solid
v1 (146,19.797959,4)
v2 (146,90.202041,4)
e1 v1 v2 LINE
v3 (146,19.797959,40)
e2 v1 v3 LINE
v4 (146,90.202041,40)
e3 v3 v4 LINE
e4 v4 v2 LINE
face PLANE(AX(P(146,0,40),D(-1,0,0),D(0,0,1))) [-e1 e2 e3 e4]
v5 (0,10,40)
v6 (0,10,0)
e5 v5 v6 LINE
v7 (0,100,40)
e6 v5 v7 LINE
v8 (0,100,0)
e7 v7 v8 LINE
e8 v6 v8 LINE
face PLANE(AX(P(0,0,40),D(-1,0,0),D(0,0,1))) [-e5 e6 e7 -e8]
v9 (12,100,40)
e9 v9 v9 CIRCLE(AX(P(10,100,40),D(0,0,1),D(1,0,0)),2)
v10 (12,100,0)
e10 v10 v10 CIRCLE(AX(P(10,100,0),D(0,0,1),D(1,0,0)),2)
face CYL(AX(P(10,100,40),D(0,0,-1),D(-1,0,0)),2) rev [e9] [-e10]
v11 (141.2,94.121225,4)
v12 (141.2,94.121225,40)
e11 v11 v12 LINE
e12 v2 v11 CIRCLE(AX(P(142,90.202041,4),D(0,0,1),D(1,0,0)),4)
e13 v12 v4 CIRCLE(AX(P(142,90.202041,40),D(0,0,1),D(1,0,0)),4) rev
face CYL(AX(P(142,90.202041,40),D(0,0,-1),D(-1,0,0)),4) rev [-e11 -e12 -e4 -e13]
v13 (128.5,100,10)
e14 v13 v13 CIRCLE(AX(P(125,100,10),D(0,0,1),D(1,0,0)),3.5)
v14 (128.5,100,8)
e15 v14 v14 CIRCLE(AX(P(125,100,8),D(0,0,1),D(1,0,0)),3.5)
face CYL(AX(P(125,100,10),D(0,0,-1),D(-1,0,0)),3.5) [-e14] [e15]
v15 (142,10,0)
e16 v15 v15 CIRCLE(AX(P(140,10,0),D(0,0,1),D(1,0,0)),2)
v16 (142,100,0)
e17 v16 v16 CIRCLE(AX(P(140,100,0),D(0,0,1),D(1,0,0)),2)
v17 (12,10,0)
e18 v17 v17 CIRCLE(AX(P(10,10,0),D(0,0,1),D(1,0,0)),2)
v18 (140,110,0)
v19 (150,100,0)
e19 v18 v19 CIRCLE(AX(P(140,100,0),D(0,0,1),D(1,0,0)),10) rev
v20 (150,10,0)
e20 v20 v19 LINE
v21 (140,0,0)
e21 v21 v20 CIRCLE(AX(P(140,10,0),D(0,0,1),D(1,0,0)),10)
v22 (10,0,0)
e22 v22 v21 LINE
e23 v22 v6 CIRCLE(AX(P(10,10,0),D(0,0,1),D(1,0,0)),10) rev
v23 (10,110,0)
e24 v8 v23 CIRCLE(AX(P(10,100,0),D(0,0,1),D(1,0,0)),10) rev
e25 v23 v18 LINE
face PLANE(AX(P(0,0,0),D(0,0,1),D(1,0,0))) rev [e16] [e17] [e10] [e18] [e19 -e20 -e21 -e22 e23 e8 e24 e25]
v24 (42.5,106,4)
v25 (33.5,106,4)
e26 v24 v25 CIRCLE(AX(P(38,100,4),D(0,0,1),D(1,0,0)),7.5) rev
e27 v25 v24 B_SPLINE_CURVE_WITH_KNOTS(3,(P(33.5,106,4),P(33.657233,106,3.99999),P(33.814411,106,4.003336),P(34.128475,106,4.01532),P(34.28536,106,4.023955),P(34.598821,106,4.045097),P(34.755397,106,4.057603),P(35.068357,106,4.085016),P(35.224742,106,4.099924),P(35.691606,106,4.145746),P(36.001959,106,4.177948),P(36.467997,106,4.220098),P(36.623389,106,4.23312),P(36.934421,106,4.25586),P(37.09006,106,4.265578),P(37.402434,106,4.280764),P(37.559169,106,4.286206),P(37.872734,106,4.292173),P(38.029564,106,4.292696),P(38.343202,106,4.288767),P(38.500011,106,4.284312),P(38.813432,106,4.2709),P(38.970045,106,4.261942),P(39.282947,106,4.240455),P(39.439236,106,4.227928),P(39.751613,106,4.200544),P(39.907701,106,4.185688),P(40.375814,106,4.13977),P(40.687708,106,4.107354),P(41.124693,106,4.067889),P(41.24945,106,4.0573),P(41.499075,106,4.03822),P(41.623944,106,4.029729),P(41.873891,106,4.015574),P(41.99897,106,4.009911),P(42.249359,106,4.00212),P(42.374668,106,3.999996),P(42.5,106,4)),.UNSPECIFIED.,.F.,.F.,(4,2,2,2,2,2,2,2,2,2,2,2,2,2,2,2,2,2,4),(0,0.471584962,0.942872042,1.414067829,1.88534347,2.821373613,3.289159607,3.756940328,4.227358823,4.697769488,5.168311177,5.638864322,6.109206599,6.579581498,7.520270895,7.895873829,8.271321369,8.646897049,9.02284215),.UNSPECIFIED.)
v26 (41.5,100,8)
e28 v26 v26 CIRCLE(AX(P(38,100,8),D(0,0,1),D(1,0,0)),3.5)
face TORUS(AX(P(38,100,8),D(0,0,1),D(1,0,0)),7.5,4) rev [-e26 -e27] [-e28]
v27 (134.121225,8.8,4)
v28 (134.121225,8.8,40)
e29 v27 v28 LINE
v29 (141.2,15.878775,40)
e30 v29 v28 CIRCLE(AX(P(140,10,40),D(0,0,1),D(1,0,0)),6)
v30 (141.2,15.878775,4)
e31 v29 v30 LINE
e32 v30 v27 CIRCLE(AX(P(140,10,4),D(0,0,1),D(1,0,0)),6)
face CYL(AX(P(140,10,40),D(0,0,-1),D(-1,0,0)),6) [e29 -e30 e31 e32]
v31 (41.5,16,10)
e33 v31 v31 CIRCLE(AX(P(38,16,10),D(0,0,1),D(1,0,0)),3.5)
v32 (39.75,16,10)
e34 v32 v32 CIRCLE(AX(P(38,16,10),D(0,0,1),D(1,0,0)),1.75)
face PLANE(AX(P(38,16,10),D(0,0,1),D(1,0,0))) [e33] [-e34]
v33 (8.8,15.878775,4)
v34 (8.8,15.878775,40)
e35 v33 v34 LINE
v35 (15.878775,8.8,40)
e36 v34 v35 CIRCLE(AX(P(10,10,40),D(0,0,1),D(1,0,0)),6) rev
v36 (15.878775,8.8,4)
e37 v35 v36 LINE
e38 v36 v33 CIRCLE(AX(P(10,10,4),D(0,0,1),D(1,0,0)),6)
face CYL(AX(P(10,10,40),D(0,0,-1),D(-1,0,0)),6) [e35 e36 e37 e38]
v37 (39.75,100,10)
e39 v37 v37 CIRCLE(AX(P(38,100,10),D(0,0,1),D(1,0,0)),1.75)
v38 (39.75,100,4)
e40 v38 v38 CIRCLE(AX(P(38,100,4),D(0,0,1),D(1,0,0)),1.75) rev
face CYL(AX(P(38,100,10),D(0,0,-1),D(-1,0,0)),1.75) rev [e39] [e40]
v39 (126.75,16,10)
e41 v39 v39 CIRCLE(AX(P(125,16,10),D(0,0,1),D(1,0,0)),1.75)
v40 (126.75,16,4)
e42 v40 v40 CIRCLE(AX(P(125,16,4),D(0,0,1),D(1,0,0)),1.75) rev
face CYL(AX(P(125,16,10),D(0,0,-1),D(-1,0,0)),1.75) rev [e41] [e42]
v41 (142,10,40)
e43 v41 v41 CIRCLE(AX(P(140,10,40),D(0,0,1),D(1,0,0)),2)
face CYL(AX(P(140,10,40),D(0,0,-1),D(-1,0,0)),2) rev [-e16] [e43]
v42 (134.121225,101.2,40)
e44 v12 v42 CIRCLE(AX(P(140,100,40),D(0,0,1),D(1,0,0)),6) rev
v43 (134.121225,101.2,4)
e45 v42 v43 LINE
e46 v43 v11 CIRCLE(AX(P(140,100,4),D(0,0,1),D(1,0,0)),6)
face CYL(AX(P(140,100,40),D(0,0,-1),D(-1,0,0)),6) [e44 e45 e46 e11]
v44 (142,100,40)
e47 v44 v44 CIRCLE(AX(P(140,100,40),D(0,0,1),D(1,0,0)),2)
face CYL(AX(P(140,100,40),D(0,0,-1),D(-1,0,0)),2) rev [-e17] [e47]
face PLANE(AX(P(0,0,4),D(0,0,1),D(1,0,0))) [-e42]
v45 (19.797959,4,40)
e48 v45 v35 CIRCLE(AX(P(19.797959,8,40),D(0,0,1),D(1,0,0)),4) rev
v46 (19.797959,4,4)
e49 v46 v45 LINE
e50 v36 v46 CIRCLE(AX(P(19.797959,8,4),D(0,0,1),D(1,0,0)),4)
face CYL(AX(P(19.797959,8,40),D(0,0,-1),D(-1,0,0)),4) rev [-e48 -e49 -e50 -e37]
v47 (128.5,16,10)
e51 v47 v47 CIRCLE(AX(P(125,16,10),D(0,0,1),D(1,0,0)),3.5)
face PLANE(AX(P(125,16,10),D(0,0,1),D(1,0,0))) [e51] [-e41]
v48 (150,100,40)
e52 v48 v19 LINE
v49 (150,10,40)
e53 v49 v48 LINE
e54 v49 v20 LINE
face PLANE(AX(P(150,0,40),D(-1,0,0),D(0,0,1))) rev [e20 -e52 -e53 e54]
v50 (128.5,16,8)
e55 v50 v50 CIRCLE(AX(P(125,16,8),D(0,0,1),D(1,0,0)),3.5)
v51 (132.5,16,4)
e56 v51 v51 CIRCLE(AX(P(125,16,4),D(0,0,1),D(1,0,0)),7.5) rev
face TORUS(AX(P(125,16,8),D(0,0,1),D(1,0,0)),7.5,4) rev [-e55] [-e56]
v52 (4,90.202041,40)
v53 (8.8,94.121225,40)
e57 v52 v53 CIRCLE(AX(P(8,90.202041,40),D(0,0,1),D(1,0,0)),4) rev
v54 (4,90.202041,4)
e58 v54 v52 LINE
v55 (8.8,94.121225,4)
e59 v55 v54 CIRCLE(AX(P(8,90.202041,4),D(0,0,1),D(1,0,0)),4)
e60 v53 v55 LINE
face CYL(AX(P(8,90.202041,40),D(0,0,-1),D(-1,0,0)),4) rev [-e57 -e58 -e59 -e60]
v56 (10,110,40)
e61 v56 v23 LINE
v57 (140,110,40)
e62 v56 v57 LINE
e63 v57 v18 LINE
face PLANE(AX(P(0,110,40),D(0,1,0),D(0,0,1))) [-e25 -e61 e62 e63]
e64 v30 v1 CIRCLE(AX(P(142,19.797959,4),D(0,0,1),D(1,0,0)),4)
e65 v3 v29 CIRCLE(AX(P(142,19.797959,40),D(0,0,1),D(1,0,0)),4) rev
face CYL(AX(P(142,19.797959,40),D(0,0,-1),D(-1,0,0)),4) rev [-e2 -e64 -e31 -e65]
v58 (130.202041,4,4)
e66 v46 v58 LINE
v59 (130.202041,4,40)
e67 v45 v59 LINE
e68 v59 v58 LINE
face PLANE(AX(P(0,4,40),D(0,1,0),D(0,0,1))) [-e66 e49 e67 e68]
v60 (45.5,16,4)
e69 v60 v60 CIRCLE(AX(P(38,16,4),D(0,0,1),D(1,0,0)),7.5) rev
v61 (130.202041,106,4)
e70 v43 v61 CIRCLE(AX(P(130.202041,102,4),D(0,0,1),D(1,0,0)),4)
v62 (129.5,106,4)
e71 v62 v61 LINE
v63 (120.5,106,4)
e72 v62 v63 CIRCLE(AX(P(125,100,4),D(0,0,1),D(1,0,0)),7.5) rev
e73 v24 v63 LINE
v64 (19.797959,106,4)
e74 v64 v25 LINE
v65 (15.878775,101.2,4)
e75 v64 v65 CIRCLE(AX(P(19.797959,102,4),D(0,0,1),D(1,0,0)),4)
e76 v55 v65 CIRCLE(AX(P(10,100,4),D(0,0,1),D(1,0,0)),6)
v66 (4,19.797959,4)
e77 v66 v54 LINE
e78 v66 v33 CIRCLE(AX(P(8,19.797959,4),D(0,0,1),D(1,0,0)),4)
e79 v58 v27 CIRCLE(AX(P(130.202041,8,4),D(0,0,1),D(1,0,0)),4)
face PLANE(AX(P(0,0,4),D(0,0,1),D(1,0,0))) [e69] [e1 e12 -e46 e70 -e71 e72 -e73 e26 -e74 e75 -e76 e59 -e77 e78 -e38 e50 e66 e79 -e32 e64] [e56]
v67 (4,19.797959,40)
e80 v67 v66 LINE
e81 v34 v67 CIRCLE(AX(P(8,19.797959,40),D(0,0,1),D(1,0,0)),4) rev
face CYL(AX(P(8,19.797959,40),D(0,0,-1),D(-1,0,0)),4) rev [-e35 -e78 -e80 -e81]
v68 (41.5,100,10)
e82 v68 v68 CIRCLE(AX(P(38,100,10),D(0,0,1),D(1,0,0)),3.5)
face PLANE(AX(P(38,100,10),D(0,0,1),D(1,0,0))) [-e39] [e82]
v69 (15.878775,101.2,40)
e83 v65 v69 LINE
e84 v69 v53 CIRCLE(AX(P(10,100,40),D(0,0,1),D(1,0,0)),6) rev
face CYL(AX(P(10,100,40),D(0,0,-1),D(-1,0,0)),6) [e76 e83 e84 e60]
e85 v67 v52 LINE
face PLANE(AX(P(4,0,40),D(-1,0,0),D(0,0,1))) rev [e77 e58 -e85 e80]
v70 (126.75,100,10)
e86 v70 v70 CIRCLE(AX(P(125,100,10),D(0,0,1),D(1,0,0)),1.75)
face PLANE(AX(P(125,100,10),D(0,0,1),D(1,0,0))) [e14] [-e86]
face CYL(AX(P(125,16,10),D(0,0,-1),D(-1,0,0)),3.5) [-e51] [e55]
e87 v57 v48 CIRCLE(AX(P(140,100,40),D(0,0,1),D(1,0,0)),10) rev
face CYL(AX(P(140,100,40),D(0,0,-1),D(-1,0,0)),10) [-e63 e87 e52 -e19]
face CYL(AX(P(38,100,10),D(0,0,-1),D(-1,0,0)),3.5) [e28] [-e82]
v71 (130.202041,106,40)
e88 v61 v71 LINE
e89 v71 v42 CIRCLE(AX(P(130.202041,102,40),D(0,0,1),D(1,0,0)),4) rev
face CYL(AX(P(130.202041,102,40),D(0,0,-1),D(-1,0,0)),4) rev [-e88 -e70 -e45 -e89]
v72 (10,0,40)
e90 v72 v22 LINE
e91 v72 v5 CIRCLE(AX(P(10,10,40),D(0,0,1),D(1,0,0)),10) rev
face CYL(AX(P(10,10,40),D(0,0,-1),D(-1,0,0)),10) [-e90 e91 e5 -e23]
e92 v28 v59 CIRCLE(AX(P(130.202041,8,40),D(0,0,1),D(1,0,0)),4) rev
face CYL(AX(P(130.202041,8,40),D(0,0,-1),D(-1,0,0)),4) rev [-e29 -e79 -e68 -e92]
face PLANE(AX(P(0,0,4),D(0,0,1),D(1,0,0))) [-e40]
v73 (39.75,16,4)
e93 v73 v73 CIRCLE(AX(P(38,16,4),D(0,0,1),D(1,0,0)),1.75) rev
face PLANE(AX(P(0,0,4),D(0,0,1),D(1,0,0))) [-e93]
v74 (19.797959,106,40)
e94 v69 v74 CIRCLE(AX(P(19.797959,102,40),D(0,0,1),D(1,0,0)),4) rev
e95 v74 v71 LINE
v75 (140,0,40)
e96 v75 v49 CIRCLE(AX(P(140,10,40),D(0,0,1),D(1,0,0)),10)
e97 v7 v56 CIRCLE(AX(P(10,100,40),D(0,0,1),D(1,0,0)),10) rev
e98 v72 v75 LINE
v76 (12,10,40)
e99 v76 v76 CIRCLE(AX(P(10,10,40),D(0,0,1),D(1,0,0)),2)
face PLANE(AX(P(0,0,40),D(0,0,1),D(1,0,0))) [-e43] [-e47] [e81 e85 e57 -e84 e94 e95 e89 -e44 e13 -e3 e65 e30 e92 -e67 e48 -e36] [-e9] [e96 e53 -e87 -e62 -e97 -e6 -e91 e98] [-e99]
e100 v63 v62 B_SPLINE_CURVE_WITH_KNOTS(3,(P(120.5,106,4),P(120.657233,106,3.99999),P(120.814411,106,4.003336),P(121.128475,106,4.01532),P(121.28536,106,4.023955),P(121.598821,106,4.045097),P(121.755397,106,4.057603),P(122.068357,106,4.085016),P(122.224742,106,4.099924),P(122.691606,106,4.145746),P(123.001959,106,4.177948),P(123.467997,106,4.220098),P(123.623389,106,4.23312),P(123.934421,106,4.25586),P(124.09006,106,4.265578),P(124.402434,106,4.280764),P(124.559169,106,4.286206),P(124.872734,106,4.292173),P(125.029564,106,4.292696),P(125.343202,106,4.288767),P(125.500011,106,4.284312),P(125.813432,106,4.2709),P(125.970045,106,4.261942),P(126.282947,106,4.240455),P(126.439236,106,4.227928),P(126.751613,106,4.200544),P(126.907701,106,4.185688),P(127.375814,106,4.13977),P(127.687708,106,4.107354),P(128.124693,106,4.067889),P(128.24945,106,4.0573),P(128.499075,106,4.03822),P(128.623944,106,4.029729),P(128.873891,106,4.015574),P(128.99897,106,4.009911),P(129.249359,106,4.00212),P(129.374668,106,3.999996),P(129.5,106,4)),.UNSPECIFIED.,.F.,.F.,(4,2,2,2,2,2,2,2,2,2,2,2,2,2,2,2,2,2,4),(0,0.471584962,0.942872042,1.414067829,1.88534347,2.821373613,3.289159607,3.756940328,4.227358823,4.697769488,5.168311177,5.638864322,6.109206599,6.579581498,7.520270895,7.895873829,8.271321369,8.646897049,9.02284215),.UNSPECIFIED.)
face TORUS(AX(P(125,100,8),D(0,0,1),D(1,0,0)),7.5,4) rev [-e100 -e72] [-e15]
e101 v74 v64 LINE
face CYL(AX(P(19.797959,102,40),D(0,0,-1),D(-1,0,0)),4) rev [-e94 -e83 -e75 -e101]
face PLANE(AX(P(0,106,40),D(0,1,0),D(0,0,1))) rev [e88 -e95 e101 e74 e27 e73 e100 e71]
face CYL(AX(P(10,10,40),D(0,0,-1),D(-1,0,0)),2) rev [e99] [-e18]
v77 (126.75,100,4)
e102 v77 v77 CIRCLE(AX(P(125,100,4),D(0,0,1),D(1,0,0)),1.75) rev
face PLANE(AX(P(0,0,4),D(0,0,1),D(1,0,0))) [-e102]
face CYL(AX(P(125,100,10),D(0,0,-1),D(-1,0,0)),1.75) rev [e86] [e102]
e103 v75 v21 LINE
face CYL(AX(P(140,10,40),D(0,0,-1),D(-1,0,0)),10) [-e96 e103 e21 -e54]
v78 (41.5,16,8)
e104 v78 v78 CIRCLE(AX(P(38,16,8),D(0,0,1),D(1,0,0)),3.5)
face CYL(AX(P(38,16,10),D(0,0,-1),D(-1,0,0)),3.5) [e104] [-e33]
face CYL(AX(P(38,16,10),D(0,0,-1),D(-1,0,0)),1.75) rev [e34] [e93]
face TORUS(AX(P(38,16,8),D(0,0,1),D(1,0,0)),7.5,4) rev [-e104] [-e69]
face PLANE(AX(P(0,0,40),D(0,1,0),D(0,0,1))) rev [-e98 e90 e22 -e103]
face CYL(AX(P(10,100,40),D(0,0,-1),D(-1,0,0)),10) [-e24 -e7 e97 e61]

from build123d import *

# Parameters (mm, degrees)
BOSS_EXTRUDE1_DEPTH = 4
SKETCH1_3_R         = 2
BOSS_EXTRUDE4_DEPTH = 40
FILLET3_R           = 4
SKETCH4_R           = 3.5
SKETCH4_R_2         = 1.75
BOSS_EXTRUDE5_DEPTH = 6
FILLET2_R           = 4


with BuildPart() as part:
    # Sketch1 → Boss-Extrude1 (new body)
    with BuildSketch(Plane.XY):
        with BuildLine():
            ThreePointArc((16, 10), (14.242640687, 5.757359313), (10, 4))
            Line((10, 4), (140, 4))
            ThreePointArc((140, 4), (135.757359313, 14.242640687), (146, 10))
            Line((146, 10), (146, 100))
            ThreePointArc((146, 100), (135.757359313, 95.757359313), (140, 106))
            Line((140, 106), (10, 106))
            ThreePointArc((10, 106), (14.242640687, 104.242640687), (16, 100))
            ThreePointArc((16, 100), (10, 94), (4, 100))
            Line((4, 100), (4, 10))
            ThreePointArc((4, 10), (10, 16), (16, 10))
        make_face()
    extrude(amount=BOSS_EXTRUDE1_DEPTH)

    # Sketch1<3> → Boss-Extrude4 (add)
    with BuildSketch(Plane.XY):
        with BuildLine():
            ThreePointArc((0, 10), (2.928932188, 2.928932188), (10, 0))
            Line((10, 0), (140, 0))
            ThreePointArc((140, 0), (147.071067812, 2.928932188), (150, 10))
            Line((150, 10), (150, 100))
            ThreePointArc((150, 100), (147.071067812, 107.071067812), (140, 110))
            Line((140, 110), (10, 110))
            ThreePointArc((10, 110), (2.928932188, 107.071067812), (0, 100))
            Line((0, 100), (0, 10))
        make_face()
        with BuildLine():
            Line((140, 4), (10, 4))
            ThreePointArc((10, 4), (14.242640687, 14.242640687), (4, 10))
            Line((4, 10), (4, 100))
            ThreePointArc((4, 100), (14.242640687, 95.757359313), (10, 106))
            Line((10, 106), (140, 106))
            ThreePointArc((140, 106), (135.757359313, 95.757359313), (146, 100))
            Line((146, 100), (146, 10))
            ThreePointArc((146, 10), (135.757359313, 14.242640687), (140, 4))
        make_face(mode=Mode.SUBTRACT)
        with Locations((10, 10)):
            Circle(SKETCH1_3_R, mode=Mode.SUBTRACT)
        with Locations((140, 10)):
            Circle(SKETCH1_3_R, mode=Mode.SUBTRACT)
        with Locations((10, 100)):
            Circle(SKETCH1_3_R, mode=Mode.SUBTRACT)
        with Locations((140, 100)):
            Circle(SKETCH1_3_R, mode=Mode.SUBTRACT)
    extrude(amount=BOSS_EXTRUDE4_DEPTH)

    # Fillet3
    fillet3_edges = [part.edges().sort_by_distance(p)[0] for p in [
        (140, 4, 22),
    ]]
    fillet(fillet3_edges, radius=FILLET3_R)
    fillet3_2_edges = [part.edges().sort_by_distance(p)[0] for p in [
        (4, 100, 22),
        (10, 106, 22),
        (140, 106, 22),
        (146, 100, 22),
        (146, 10, 22),
        (10, 4, 22),
        (4, 10, 22),
    ]]
    fillet(fillet3_2_edges, radius=FILLET3_R)

    # Sketch4 → Boss-Extrude5 (add)
    # profile 1 of 4: a face of its own
    with BuildSketch(Plane.XY.offset(4)):
        with Locations((38, 100)):
            Circle(SKETCH4_R)
        with Locations((38, 100)):
            Circle(SKETCH4_R_2, mode=Mode.SUBTRACT)
    # profile 2 of 4: a face of its own
    with BuildSketch(Plane.XY.offset(4)):
        with Locations((38, 16)):
            Circle(SKETCH4_R)
        with Locations((38, 16)):
            Circle(SKETCH4_R_2, mode=Mode.SUBTRACT)
    # profile 3 of 4: a face of its own
    with BuildSketch(Plane.XY.offset(4)):
        with Locations((125, 16)):
            Circle(SKETCH4_R)
        with Locations((125, 16)):
            Circle(SKETCH4_R_2, mode=Mode.SUBTRACT)
    # profile 4 of 4: a face of its own
    with BuildSketch(Plane.XY.offset(4)):
        with Locations((125, 100)):
            Circle(SKETCH4_R)
        with Locations((125, 100)):
            Circle(SKETCH4_R_2, mode=Mode.SUBTRACT)
    extrude(amount=BOSS_EXTRUDE5_DEPTH)

    # Fillet2
    # the kernel refuses this fillet: 4 mm, written as the material it adds along each edge
    with BuildSketch(Plane(origin=(38, 100, 4), x_dir=(1, 0, 0), z_dir=(0, -1, 0))) as fillet2_piece_1:
        with BuildLine():
            CenterArc((3.5 + FILLET2_R, FILLET2_R), FILLET2_R, 180, 90)
            Line((3.5, FILLET2_R), (3.5, 0))
            Line((3.5, 0), (3.5 + FILLET2_R, 0))
        make_face()
    revolve(axis=Axis((38, 100, 4), (0, 0, 1)))
    with BuildSketch(Plane(origin=(38, 16, 4), x_dir=(1, 0, 0), z_dir=(0, -1, 0))) as fillet2_piece_2:
        with BuildLine():
            CenterArc((3.5 + FILLET2_R, FILLET2_R), FILLET2_R, 180, 90)
            Line((3.5, FILLET2_R), (3.5, 0))
            Line((3.5, 0), (3.5 + FILLET2_R, 0))
        make_face()
    revolve(axis=Axis((38, 16, 4), (0, 0, 1)))
    with BuildSketch(Plane(origin=(125, 16, 4), x_dir=(1, 0, 0), z_dir=(0, -1, 0))) as fillet2_piece_3:
        with BuildLine():
            CenterArc((3.5 + FILLET2_R, FILLET2_R), FILLET2_R, 180, 90)
            Line((3.5, FILLET2_R), (3.5, 0))
            Line((3.5, 0), (3.5 + FILLET2_R, 0))
        make_face()
    revolve(axis=Axis((125, 16, 4), (0, 0, 1)))
    with BuildSketch(Plane(origin=(125, 100, 4), x_dir=(1, 0, 0), z_dir=(0, -1, 0))) as fillet2_piece_4:
        with BuildLine():
            CenterArc((3.5 + FILLET2_R, FILLET2_R), FILLET2_R, 180, 90)
            Line((3.5, FILLET2_R), (3.5, 0))
            Line((3.5, 0), (3.5 + FILLET2_R, 0))
        make_face()
    revolve(axis=Axis((125, 100, 4), (0, 0, 1)))


solid = part.part
